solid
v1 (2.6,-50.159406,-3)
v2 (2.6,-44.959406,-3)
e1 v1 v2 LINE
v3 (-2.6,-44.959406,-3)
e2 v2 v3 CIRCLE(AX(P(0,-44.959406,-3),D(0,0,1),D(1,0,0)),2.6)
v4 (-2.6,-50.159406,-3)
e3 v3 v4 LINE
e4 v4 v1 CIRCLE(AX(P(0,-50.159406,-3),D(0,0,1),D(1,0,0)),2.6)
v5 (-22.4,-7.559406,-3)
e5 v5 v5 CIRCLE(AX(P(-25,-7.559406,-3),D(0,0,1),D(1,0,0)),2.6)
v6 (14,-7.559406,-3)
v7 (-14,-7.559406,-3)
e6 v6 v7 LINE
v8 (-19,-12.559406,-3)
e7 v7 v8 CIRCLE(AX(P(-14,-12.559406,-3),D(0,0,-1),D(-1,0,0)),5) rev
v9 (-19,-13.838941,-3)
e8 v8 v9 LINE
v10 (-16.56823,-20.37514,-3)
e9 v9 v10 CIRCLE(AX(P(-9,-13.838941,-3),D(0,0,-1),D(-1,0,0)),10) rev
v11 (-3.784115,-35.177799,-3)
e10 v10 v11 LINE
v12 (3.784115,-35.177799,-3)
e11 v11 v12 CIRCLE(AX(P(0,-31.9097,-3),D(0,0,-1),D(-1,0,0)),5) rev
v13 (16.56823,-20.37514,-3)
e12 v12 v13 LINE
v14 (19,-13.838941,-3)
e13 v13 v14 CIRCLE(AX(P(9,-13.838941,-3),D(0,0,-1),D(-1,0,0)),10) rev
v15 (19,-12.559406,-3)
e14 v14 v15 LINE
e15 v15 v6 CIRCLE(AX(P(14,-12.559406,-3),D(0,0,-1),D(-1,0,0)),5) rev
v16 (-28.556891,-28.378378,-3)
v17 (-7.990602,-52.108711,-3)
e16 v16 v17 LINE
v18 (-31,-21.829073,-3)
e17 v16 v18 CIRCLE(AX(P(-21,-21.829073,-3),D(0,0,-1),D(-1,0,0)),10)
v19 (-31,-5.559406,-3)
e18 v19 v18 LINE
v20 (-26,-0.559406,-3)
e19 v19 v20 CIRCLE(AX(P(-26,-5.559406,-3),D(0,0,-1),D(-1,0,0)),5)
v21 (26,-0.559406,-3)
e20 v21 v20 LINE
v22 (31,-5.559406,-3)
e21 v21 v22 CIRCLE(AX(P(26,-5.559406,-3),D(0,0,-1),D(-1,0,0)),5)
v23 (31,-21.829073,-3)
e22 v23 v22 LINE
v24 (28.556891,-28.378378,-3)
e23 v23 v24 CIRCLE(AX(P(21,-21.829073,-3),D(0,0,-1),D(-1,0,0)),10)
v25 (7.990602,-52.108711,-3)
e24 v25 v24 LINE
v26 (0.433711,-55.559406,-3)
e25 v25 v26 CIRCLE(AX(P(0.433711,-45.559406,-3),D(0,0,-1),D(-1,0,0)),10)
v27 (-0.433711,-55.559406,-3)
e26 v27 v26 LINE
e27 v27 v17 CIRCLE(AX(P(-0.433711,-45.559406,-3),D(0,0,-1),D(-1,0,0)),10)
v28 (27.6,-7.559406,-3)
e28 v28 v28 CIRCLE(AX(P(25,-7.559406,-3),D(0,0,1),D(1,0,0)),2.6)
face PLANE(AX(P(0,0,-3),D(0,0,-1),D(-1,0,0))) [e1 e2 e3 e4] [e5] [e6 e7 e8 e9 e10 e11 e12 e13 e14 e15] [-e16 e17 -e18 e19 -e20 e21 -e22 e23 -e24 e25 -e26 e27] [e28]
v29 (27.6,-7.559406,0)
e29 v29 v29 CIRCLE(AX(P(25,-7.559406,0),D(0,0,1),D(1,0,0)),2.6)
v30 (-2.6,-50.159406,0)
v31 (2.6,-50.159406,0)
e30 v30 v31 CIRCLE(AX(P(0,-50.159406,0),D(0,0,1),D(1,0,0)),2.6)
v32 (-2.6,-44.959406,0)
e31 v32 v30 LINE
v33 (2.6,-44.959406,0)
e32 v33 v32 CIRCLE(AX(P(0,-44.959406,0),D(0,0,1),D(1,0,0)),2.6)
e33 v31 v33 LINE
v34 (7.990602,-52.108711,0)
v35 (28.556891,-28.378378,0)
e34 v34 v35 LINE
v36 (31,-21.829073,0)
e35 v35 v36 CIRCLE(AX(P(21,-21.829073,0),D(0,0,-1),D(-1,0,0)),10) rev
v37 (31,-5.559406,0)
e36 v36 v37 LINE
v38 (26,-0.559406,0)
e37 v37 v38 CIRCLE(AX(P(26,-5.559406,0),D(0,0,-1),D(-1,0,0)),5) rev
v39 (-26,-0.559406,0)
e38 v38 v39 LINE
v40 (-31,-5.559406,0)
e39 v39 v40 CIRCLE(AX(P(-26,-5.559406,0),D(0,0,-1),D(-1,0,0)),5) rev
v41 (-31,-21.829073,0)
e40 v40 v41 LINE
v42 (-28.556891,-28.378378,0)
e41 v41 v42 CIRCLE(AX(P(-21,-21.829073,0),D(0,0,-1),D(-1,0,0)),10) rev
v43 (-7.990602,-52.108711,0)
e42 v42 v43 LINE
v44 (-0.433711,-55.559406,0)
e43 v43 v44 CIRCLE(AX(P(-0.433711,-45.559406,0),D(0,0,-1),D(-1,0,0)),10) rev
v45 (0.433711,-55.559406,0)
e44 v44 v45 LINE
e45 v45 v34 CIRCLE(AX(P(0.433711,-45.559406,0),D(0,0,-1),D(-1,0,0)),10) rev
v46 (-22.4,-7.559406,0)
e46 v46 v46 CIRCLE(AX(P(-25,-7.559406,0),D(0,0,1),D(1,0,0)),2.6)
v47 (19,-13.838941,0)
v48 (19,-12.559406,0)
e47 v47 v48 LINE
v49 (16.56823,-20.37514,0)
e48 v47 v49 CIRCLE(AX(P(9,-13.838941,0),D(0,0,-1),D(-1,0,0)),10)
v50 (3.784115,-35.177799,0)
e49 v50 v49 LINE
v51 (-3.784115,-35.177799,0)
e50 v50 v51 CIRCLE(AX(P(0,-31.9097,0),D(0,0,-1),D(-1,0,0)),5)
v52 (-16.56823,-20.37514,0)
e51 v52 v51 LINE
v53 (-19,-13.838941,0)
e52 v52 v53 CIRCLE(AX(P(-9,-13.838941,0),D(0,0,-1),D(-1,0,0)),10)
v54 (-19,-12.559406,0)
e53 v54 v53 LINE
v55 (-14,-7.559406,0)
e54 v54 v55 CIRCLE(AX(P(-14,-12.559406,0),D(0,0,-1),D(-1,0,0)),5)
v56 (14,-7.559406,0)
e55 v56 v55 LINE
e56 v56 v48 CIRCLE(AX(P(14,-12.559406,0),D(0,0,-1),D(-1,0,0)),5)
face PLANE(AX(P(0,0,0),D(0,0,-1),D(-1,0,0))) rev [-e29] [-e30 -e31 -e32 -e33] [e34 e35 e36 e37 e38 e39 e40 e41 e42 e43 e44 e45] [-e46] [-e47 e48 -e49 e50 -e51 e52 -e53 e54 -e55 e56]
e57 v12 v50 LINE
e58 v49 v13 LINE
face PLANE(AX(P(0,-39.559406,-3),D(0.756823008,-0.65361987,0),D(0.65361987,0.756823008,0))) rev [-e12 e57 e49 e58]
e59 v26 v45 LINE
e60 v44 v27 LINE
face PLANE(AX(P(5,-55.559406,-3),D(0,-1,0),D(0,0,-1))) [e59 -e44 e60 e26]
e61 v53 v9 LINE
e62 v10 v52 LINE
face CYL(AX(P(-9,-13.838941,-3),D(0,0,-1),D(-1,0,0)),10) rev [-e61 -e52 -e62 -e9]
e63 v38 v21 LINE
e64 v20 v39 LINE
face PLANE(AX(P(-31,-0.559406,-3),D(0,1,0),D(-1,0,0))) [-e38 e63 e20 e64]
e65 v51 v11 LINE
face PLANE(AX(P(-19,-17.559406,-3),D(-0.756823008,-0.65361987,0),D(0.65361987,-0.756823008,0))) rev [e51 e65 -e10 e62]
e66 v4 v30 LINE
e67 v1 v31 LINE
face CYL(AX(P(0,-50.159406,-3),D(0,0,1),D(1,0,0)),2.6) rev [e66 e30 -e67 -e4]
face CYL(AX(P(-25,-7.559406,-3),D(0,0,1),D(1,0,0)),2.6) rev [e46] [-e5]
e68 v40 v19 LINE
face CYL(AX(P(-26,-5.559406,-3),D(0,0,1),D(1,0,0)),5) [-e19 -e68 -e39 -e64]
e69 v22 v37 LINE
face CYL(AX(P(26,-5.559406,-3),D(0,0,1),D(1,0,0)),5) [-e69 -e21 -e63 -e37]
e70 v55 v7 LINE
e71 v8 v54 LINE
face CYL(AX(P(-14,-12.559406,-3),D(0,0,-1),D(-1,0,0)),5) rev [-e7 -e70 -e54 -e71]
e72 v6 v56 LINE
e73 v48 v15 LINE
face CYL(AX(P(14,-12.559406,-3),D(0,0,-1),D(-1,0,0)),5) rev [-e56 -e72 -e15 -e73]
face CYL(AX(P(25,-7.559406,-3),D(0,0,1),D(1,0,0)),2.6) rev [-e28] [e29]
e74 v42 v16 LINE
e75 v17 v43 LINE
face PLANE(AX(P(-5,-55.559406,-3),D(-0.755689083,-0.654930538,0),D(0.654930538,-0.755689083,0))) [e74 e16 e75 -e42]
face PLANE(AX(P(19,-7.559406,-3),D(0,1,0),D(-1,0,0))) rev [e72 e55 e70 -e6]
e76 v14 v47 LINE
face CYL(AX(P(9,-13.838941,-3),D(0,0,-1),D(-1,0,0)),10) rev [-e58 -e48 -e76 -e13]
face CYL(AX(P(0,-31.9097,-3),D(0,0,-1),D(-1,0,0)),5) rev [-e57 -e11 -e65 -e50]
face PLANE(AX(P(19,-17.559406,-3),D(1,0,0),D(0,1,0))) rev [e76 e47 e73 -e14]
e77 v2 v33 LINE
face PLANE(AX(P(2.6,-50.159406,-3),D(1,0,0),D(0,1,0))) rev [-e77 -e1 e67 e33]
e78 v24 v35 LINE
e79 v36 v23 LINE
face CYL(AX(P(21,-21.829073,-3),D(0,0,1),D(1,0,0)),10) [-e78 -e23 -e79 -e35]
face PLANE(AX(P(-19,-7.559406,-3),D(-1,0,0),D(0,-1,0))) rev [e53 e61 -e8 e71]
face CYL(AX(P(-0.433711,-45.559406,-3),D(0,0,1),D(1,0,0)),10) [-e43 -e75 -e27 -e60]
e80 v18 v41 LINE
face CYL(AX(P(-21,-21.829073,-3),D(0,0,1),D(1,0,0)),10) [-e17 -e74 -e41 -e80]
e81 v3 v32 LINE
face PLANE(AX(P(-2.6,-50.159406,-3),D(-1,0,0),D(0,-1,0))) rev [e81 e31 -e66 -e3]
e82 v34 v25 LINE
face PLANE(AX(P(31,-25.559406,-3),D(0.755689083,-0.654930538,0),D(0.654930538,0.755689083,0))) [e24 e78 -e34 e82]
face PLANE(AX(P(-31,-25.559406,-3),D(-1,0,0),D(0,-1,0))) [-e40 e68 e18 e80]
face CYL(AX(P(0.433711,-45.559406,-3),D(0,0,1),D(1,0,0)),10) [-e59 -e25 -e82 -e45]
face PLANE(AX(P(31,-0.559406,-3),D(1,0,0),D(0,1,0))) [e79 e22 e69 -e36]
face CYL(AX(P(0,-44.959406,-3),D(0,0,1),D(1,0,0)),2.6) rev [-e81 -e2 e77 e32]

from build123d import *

# Parameters (mm, degrees)
SKETCH1_R          = 2.6
BASE_FLANGE1_DEPTH = 3
FILLET_10_MM_R     = 10
FILLET_5_MM_R      = 5


# Sheet-metal steps are written as plain solids
with BuildPart() as part:
    # Sketch1 → Base-Flange1 (new body)
    with BuildSketch(Plane.XY):
        Polygon((-31, -0.559405941), (31, -0.559405941), (31, -25.559405941), (5, -55.559405941), (-5, -55.559405941), (-31, -25.559405941), align=None)
        with Locations((25, -7.559405941)):
            Circle(SKETCH1_R, mode=Mode.SUBTRACT)
        with Locations((-25, -7.559405941)):
            Circle(SKETCH1_R, mode=Mode.SUBTRACT)
        with BuildLine():
            Line((-2.6, -50.159405941), (-2.6, -44.959405941))
            ThreePointArc((-2.6, -44.959405941), (0, -42.359405941), (2.6, -44.959405941))
            Line((2.6, -44.959405941), (2.6, -50.159405941))
            ThreePointArc((2.6, -50.159405941), (0, -52.759405941), (-2.6, -50.159405941))
        make_face(mode=Mode.SUBTRACT)
        Polygon((0, -39.559405941), (19, -17.559405941), (19, -7.559405941), (-19, -7.559405941), (-19, -17.559405941), align=None, mode=Mode.SUBTRACT)
    extrude(amount=-BASE_FLANGE1_DEPTH)

    # fillet 10 mm
    fillet_10_mm_edges = [part.edges().sort_by_distance(p)[0] for p in [
        (31, -25.559405941, -1.5),
        (5, -55.559405941, -1.5),
        (-5, -55.559405941, -1.5),
        (-31, -25.559405941, -1.5),
        (-19, -17.559405941, -1.5),
        (19, -17.559405941, -1.5),
    ]]
    fillet(fillet_10_mm_edges, radius=FILLET_10_MM_R)

    # fillet 5 mm
    fillet_5_mm_edges = [part.edges().sort_by_distance(p)[0] for p in [
        (-31, -0.559405941, -1.5),
        (31, -0.559405941, -1.5),
        (0, -39.559405941, -1.5),
        (-19, -7.559405941, -1.5),
        (19, -7.559405941, -1.5),
    ]]
    fillet(fillet_5_mm_edges, radius=FILLET_5_MM_R)


solid = part.part
